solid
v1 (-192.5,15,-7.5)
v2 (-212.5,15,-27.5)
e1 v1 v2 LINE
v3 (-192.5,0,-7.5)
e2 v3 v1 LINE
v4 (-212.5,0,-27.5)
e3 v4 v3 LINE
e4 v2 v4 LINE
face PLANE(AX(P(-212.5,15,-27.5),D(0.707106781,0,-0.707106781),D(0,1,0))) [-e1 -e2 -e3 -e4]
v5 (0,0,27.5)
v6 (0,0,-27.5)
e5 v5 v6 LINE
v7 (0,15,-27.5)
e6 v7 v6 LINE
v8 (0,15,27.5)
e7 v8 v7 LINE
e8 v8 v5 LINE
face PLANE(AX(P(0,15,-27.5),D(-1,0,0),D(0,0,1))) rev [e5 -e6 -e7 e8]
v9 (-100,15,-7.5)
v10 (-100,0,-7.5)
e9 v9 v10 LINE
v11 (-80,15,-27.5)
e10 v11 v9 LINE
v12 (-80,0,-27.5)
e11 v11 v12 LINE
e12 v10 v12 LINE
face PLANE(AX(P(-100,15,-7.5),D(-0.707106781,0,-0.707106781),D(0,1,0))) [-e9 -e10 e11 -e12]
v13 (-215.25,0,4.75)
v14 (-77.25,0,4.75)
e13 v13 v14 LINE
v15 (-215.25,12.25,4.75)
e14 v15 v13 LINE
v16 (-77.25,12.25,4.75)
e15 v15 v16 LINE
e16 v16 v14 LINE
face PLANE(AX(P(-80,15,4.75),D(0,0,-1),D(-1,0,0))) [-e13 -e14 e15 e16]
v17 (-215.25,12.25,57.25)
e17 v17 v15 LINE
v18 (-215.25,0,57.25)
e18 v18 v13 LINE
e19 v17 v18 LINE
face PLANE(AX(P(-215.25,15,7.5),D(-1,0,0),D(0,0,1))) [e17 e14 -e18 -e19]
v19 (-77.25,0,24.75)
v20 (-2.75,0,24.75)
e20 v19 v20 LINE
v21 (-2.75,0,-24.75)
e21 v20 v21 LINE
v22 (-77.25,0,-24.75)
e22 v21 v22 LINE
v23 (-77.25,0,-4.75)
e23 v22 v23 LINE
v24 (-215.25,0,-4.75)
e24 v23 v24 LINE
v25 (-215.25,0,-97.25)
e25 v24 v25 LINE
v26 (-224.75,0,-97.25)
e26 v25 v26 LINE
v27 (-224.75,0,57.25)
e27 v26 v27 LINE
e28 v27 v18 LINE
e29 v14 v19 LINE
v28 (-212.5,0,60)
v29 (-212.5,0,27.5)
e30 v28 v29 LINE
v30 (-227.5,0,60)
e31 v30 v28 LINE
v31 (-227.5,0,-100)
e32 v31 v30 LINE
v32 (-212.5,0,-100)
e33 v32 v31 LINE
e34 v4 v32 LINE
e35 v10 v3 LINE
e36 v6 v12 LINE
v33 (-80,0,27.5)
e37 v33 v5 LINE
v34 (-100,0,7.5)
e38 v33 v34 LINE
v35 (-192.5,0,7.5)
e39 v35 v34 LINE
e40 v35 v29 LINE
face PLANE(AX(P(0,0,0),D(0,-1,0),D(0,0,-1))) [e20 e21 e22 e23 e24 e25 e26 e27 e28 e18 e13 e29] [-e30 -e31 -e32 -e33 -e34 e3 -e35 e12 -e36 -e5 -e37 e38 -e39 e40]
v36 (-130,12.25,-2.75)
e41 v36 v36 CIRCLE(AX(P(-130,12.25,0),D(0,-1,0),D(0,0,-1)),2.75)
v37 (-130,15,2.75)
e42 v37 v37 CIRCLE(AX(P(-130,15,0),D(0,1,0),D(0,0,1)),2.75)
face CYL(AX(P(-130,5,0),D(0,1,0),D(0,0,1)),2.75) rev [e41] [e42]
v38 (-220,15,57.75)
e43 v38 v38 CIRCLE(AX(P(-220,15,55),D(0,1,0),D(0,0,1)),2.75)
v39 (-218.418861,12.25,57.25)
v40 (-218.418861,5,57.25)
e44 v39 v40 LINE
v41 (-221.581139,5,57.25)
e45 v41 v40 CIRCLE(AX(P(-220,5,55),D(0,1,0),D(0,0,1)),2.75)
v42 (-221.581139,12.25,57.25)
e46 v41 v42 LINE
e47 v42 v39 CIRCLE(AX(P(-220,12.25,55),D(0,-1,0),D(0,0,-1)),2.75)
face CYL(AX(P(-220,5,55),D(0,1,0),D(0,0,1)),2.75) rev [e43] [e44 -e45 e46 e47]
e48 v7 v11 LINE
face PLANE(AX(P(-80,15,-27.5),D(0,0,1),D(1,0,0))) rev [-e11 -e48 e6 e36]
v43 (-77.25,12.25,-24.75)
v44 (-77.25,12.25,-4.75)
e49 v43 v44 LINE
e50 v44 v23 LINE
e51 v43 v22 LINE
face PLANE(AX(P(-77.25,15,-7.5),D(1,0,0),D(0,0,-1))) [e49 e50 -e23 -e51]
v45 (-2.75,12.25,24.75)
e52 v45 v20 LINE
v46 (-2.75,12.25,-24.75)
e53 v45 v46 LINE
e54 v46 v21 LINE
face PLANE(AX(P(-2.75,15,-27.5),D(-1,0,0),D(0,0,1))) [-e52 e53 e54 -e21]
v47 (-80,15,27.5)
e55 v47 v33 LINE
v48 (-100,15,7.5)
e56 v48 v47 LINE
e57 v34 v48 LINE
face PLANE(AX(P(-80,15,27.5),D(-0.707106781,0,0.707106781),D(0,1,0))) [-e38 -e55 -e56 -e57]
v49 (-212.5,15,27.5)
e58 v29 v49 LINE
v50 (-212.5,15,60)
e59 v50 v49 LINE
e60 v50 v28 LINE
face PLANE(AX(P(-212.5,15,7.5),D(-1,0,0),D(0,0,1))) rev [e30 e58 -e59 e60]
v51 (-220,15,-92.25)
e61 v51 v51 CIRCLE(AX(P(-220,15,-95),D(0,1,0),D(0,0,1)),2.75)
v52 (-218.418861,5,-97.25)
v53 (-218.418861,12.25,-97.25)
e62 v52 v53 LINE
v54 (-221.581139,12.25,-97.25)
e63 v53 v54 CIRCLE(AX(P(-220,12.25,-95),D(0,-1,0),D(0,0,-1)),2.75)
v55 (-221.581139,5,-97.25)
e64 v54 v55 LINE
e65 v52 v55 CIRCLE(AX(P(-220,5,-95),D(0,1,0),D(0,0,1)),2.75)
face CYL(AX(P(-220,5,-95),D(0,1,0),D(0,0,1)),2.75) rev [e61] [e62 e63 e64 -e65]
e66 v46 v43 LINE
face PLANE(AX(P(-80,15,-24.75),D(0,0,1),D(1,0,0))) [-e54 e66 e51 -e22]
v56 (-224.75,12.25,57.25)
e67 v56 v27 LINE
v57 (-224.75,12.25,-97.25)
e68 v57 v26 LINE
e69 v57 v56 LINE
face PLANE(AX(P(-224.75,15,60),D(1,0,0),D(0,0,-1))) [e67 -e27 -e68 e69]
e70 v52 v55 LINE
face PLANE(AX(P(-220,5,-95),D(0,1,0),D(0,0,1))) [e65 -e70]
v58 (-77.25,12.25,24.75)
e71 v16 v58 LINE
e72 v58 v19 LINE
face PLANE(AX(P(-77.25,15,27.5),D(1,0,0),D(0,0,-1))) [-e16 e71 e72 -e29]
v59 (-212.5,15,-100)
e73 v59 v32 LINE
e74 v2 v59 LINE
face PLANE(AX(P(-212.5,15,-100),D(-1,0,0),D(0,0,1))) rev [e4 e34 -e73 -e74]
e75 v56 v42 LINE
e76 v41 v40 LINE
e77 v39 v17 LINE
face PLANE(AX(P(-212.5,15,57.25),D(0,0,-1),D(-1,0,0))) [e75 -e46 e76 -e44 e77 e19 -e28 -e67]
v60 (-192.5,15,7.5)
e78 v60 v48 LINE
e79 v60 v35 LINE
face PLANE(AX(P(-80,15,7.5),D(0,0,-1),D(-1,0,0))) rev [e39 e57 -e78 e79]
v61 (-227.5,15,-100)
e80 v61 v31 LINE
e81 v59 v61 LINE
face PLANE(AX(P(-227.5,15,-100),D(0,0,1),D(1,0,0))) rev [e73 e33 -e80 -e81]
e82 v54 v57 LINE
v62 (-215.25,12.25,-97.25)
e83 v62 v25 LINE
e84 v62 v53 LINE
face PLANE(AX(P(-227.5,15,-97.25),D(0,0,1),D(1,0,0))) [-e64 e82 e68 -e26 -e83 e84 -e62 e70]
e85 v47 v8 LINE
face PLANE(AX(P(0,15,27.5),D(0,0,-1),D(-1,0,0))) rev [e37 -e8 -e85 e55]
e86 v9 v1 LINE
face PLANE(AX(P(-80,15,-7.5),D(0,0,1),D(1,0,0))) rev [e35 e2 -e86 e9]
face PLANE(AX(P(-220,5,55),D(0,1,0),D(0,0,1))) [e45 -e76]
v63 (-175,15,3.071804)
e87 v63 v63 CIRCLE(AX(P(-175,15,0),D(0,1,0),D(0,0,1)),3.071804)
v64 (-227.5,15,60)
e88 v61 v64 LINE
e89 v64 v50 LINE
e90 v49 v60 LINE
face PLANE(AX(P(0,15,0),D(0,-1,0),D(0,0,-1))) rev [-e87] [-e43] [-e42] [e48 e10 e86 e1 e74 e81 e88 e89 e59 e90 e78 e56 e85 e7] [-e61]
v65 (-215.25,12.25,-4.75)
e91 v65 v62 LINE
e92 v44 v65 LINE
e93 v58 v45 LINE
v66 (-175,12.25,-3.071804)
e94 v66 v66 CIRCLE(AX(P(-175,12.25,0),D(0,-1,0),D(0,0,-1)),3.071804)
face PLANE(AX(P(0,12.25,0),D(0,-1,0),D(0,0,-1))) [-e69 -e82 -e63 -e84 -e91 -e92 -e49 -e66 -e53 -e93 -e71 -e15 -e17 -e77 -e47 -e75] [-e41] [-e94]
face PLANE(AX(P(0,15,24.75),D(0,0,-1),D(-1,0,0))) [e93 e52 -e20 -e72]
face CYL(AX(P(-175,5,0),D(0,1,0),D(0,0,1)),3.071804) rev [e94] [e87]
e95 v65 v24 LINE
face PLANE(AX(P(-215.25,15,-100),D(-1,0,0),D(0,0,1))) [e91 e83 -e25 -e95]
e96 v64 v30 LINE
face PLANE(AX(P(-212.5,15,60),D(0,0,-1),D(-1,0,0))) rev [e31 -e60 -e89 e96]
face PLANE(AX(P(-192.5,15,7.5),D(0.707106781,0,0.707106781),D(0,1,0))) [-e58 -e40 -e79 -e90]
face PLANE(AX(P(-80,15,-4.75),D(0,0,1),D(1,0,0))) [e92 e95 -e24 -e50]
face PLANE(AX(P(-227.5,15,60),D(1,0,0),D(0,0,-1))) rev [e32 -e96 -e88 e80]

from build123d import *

# Parameters (mm, degrees)
BOSS_EXTRUDE1_DEPTH = 15
SHELL1_T            = -2.75
SKETCH2_R           = 2.75
SKETCH2_R_2         = 3.071803615
CUT_EXTRUDE1_DEPTH  = 10
CHAMFER1_SIZE       = 20


with BuildPart() as part:
    # Sketch1 → Boss-Extrude1 (new body)
    with BuildSketch(Plane(origin=(0, 0, 0), x_dir=(1, 0, 0), z_dir=(0, 1, 0))):
        Polygon((-227.5, 100), (-212.5, 100), (-212.5, 7.5), (-80, 7.5), (-80, 27.5), (0, 27.5), (0, 7.5), (0, -7.5), (0, -27.5), (-80, -27.5), (-80, -7.5), (-212.5, -7.5), (-212.5, -60), (-227.5, -60), align=None)
    extrude(amount=BOSS_EXTRUDE1_DEPTH)

    # Shell1
    shell1_openings = [part.faces().sort_by_distance(p)[0] for p in [
        (-113.191678521, 0, -5.46230441),
    ]]
    offset(amount=SHELL1_T, openings=shell1_openings, kind=Kind.INTERSECTION)

    # Sketch2 → Cut-Extrude1 (cut)
    with BuildSketch(Plane(origin=(0, 15, 0), x_dir=(1, 0, 0), z_dir=(0, 1, 0))):
        with Locations(Location((-130, 0, 0), (0, 0, 270))):
            Circle(SKETCH2_R)
        with Locations(Location((-220, 95, 0), (0, 0, 270))):
            Circle(SKETCH2_R)
        with Locations(Location((-220, -55, 0), (0, 0, 270))):
            Circle(SKETCH2_R)
        with Locations(Location((-175, 0, 0), (0, 0, 270))):
            Circle(SKETCH2_R_2)
    extrude(amount=-CUT_EXTRUDE1_DEPTH, mode=Mode.SUBTRACT)

    # Chamfer1
    chamfer1_edges = [part.edges().sort_by_distance(p)[0] for p in [
        (-212.5, 7.5, -7.5),
        (-212.5, 7.5, 7.5),
        (-80, 7.5, -7.5),
        (-80, 7.5, 7.5),
    ]]
    chamfer(chamfer1_edges, length=CHAMFER1_SIZE - 0.0001)  # a hair under: the kernel refuses the full size


solid = part.part
